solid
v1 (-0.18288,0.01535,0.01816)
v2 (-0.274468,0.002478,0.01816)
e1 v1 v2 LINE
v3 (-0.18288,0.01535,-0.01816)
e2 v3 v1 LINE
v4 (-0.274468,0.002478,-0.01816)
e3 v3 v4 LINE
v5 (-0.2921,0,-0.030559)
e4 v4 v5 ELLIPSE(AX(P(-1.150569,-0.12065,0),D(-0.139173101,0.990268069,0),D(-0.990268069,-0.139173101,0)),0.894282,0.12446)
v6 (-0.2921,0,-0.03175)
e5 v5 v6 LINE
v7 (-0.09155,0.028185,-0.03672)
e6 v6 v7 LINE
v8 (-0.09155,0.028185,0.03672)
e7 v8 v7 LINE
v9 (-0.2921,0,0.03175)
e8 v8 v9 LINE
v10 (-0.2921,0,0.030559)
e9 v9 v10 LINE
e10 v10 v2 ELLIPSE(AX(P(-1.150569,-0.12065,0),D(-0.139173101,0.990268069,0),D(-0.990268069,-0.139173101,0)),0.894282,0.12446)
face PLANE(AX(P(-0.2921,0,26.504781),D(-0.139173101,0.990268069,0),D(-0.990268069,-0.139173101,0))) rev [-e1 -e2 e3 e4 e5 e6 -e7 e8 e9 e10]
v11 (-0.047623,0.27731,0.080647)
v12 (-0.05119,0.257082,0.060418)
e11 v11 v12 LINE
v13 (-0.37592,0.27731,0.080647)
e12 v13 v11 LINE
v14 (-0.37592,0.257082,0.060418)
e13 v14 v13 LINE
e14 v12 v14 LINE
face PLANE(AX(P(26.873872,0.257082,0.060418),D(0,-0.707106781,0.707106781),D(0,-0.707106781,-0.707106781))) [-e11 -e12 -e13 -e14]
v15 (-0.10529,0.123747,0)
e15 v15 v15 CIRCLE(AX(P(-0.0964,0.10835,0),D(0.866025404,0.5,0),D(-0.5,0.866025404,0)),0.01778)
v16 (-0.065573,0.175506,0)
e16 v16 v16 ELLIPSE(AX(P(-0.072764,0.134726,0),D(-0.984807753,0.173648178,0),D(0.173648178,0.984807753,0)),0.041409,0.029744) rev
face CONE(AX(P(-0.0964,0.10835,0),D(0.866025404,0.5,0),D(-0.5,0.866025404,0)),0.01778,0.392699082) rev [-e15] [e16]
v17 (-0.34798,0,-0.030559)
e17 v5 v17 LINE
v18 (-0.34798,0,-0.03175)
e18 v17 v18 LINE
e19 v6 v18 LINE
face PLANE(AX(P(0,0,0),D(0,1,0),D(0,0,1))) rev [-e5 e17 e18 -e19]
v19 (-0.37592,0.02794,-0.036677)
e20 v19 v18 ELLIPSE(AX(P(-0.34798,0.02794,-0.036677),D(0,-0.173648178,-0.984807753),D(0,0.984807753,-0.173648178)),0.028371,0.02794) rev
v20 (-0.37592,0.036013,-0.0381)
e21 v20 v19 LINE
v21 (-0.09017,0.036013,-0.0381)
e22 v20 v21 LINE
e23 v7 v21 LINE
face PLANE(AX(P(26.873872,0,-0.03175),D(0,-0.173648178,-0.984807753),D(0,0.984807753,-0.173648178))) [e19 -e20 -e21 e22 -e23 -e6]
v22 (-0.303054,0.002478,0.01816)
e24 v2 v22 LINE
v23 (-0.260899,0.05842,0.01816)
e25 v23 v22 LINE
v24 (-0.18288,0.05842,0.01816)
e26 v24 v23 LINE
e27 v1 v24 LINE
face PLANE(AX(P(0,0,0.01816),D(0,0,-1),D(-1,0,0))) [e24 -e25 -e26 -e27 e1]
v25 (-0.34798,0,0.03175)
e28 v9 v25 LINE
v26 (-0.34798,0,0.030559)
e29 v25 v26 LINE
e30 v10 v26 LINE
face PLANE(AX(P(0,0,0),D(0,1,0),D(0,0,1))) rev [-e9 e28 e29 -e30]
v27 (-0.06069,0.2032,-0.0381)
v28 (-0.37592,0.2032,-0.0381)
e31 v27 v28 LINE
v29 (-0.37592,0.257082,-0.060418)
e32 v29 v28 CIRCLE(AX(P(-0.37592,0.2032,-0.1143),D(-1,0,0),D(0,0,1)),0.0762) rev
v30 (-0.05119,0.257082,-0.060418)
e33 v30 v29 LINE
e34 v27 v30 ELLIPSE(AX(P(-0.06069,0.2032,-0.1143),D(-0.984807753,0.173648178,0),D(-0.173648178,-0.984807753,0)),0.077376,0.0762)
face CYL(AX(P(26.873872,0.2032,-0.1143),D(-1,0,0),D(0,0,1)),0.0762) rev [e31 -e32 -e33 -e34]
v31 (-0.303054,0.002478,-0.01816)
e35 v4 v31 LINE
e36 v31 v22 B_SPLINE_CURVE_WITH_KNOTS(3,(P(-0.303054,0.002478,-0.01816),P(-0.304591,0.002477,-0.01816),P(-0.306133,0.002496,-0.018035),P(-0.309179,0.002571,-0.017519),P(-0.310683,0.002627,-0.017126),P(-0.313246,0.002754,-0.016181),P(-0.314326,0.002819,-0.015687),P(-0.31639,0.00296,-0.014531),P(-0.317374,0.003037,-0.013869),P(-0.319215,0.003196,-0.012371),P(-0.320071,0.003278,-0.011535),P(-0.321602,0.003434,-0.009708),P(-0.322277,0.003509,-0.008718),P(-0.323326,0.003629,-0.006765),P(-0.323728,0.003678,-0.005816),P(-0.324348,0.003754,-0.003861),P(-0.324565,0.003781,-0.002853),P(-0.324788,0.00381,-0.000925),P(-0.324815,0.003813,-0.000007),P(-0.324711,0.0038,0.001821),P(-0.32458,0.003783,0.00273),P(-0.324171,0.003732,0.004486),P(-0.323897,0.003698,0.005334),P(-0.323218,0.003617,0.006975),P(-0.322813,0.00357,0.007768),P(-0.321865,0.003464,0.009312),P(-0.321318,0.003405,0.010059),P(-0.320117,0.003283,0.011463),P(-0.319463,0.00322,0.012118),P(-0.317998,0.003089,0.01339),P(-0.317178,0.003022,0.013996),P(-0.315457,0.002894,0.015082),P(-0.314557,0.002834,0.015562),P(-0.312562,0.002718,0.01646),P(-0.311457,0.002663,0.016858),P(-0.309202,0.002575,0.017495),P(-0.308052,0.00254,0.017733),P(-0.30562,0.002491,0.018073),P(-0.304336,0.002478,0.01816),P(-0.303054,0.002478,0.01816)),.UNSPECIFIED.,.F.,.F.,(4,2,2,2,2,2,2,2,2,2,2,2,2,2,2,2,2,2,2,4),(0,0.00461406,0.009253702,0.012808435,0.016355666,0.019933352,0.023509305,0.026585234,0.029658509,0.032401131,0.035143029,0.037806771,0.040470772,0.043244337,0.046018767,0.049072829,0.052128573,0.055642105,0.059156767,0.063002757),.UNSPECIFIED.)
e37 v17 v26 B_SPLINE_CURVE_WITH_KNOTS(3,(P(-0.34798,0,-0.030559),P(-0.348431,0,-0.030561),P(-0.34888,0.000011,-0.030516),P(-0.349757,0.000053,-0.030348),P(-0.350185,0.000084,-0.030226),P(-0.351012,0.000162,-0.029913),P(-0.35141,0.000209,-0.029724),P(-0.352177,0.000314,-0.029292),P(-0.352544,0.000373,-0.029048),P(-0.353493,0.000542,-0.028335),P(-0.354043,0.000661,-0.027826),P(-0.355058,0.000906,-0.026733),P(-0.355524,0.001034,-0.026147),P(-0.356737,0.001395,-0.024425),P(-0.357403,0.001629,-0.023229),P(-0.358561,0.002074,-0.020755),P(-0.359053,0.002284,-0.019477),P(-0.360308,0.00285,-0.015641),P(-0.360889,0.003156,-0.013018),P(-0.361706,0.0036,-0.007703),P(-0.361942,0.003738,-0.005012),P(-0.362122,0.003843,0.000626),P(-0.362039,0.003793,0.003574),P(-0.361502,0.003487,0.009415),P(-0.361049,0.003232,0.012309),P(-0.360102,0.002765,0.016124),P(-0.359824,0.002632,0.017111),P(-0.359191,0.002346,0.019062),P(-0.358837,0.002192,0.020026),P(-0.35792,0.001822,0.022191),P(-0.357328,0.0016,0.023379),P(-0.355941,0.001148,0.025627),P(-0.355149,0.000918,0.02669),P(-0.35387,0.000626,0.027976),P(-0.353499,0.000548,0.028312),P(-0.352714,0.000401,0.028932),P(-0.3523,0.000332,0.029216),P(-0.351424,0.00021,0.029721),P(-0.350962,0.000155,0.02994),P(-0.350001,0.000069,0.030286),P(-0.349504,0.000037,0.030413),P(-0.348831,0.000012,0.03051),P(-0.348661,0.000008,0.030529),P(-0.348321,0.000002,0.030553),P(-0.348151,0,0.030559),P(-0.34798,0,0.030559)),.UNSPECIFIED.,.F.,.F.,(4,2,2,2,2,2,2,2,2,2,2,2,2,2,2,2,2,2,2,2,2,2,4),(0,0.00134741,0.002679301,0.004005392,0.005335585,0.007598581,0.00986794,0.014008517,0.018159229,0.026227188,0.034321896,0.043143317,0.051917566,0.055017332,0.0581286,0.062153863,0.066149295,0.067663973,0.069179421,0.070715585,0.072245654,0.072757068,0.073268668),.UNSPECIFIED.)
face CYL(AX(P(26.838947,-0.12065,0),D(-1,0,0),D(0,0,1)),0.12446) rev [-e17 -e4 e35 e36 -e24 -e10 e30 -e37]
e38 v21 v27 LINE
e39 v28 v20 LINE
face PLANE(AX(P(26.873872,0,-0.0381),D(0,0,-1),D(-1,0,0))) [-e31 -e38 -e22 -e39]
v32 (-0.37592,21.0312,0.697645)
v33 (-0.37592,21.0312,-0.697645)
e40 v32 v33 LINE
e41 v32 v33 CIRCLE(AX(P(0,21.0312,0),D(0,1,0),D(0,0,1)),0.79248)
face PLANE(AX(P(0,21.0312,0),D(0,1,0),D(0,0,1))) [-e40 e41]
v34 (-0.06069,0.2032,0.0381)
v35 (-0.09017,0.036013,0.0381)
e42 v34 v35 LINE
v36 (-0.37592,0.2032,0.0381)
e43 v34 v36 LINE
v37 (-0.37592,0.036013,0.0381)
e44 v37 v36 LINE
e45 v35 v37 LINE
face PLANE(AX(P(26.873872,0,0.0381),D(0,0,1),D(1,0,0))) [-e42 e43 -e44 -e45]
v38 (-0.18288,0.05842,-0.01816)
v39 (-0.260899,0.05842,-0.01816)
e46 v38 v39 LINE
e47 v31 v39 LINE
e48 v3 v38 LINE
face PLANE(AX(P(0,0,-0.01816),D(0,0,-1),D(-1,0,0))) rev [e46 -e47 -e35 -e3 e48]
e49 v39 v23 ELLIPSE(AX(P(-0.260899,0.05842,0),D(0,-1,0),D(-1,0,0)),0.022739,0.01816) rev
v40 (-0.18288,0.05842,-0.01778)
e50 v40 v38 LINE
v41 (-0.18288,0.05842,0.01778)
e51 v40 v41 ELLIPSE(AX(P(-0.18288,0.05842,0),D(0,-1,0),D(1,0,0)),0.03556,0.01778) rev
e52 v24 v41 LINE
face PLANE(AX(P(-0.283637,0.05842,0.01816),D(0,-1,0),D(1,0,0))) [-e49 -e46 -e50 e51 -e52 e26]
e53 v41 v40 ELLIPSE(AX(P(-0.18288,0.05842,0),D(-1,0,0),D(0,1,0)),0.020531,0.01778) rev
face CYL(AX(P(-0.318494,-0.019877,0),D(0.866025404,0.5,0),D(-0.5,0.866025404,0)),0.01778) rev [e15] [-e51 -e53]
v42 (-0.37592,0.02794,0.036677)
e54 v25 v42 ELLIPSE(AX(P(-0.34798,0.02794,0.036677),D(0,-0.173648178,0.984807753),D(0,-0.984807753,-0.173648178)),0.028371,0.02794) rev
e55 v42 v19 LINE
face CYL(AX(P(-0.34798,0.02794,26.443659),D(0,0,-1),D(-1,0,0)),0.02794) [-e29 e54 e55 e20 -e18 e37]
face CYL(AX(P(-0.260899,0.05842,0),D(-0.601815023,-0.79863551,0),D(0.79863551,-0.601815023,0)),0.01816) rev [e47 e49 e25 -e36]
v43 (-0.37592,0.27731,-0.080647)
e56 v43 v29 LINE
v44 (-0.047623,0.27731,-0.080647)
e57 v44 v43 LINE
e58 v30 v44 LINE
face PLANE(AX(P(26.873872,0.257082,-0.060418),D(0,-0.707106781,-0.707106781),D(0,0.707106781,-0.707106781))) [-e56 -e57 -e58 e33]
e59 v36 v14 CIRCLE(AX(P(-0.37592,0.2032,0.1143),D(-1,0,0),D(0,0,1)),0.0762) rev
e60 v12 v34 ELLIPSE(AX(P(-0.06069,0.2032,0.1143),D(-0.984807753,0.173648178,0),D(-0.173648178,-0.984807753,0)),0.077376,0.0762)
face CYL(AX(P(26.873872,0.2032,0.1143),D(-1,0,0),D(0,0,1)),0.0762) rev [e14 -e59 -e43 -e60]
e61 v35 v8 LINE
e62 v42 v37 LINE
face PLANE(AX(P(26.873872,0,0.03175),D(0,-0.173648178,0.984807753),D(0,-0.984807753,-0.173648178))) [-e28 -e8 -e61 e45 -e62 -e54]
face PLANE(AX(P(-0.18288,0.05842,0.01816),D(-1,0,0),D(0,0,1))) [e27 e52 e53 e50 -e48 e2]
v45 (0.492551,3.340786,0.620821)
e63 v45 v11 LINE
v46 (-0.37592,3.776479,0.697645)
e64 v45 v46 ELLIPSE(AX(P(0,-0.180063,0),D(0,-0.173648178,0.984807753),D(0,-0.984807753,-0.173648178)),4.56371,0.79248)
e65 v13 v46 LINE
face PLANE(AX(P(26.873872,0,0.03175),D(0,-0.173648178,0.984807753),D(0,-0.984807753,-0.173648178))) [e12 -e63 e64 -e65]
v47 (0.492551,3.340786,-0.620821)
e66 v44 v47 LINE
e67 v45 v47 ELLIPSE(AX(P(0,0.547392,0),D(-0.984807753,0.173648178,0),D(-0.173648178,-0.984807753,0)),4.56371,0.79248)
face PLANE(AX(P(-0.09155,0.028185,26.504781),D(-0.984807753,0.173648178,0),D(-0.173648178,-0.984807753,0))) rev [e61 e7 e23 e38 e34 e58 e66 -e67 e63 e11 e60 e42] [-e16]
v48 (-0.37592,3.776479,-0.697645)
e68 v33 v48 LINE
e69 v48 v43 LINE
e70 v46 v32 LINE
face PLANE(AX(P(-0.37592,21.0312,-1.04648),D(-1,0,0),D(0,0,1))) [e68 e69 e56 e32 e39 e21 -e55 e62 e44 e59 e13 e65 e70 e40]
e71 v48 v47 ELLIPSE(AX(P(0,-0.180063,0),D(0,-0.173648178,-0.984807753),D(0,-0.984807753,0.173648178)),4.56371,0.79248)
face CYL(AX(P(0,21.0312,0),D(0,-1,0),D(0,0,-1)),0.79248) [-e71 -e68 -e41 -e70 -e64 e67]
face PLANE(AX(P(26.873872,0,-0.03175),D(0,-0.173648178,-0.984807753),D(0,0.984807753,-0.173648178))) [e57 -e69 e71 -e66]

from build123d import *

# Parameters (mm, degrees)
TD_SKETCH_R                             = 0.79248
TL_FEATURE_DEPTH                        = 21.0312
TDF_STD_SKETCH_W                        = 2.09296
TDF_STD_SKETCH_H                        = 2.09296
TDF_STD_FEATURE_DEPTH                   = 22.061040395
ISA_20_STD_FEATURE_DEPTH                = 22.061040395
ISA_20_STD_FEATURE_DEPTH_BACK           = 22.061040395
VW_STD_FEATURE_DEPTH                    = 22.061040395
VW_STD_FEATURE_DEPTH_BACK               = 22.061040395
F_10BA_STD_FEATURE_DEPTH                = 22.061040503
F_10BA_STD_FEATURE_DEPTH_BACK           = 22.061040503
FRO_STD_FEATURE_DEPTH                   = 22.061040395
FRO_STD_FEATURE_DEPTH_BACK              = 22.061040395
C_STD_FEATURE_DEPTH                     = 22.061040395
C_STD_FEATURE_DEPTH_BACK                = 22.061040395
ERW_STD_FEATURE_DEPTH                   = 0.018159984
H_STD_FEATURE_REACH                     = 22.957
H_STD_SKETCH_R                          = 0.01778
H_STD_SKETCH_3_R                        = 0.01778
FUNNEL_FINAL_DIAMETRE_STD_FEATURE_DEPTH = 2.499995
FUNNEL_FINAL_DIAMETRE_STD_FEATURE_DRAFT = -22.5
ROUND_BR_STD_FEATURE_START              = -1
ROUND_BR_STD_FEATURE_DEPTH              = 0.936596355


with BuildPart() as part:
    # TD_sketch → TL_feature (new body)
    with BuildSketch(Plane(origin=(0, 0, 0), x_dir=(1, 0, 0), z_dir=(0, 1, 0))):
        with Locations(Location((0, 0, 0), (0, 0, 270))):
            Circle(TD_SKETCH_R)
    extrude(amount=TL_FEATURE_DEPTH)

    # TDF_STD_sketch → TDF_STD_feature (cut, through all)
    with BuildSketch(Plane(origin=(0, 0, 0), x_dir=(1, 0, 0), z_dir=(0, 1, 0))):
        with Locations((-1.4224, 0)):
            Rectangle(TDF_STD_SKETCH_W, TDF_STD_SKETCH_H)
    extrude(amount=TDF_STD_FEATURE_DEPTH, mode=Mode.SUBTRACT)

    # ISA_20_STD_sketch → ISA_20_STD_feature (cut, two sides: drawn at the far end of the back side and taken through both)
    with BuildSketch(Plane(origin=(0, 0, 0), x_dir=(0, 0, -1), z_dir=(1, 0, 0)).offset(-ISA_20_STD_FEATURE_DEPTH_BACK)):
        Polygon((-12.948362797, 73.253751326), (-3.740117997, 21.0312), (-0.03175, 0), (0.03175, 0), (3.740117997, 21.0312), (12.948362797, 73.253751326), (12.948362797, -32.802585388), (-12.948362797, -32.802585388), align=None)
    extrude(amount=ISA_20_STD_FEATURE_DEPTH + ISA_20_STD_FEATURE_DEPTH_BACK, mode=Mode.SUBTRACT)

    # VW_STD_sketch → VW_STD_feature (cut, two sides: drawn at the far end of the back side and taken through both)
    with BuildSketch(Plane(origin=(0, 0, 0), x_dir=(0, 0, -1), z_dir=(1, 0, 0)).offset(-VW_STD_FEATURE_DEPTH_BACK)):
        with BuildLine():
            Line((-70.567982417, 70.76464549), (-20.834536927, 21.0312))
            Line((-20.834536927, 21.0312), (-0.060418463, 0.257081537))
            ThreePointArc((-0.060418463, 0.257081537), (-0.04390038, 0.232360478), (-0.0381, 0.2032))
            Line((-0.0381, 0.2032), (-0.0381, 0))
            Line((-0.0381, 0), (0.0381, 0))
            Line((0.0381, 0), (0.0381, 0.2032))
            ThreePointArc((0.0381, 0.2032), (0.04390038, 0.232360478), (0.060418463, 0.257081537))
            Line((0.060418463, 0.257081537), (20.834536927, 21.0312))
            Line((20.834536927, 21.0312), (70.567982417, 70.76464549))
            Line((70.567982417, 70.76464549), (70.567982417, -69.902780741))
            Line((70.567982417, -69.902780741), (-70.567982417, -69.902780741))
            Line((-70.567982417, -69.902780741), (-70.567982417, 70.76464549))
        make_face()
    extrude(amount=VW_STD_FEATURE_DEPTH + VW_STD_FEATURE_DEPTH_BACK, mode=Mode.SUBTRACT)

    # 10BA_STD_sketch → 10BA_STD_feature (cut, two sides: drawn at the far end of the back side and taken through both)
    with BuildSketch(Plane.XY.offset(-F_10BA_STD_FEATURE_DEPTH_BACK)):
        Polygon((-53.187772193, 0), (-0.37592, 0), (-0.2921, 0), (-0.091550146, 0.028185444), (3.611847997, 21.0312), (12.782529889, 73.04072149), (91.167207648, 2.243763782), (25.196905566, -70.796957708), align=None)
    extrude(amount=F_10BA_STD_FEATURE_DEPTH + F_10BA_STD_FEATURE_DEPTH_BACK, mode=Mode.SUBTRACT)

    # FRO_STD_sketch → FRO_STD_feature (cut, two sides: drawn at the far end of the back side and taken through both)
    with BuildSketch(Plane.XY.offset(-FRO_STD_FEATURE_DEPTH_BACK)):
        with BuildLine():
            Line((-0.37592, 52.152138388), (-0.37592, 0.02794))
            ThreePointArc((-0.37592, 0.02794), (-0.367736563, 0.008183437), (-0.34798, 0))
            Line((-0.34798, 0), (51.776218388, 0))
            Line((51.776218388, 0), (-21.9385299, -73.714748288))
            Line((-21.9385299, -73.714748288), (-74.090668288, -21.5626099))
            Line((-74.090668288, -21.5626099), (-0.37592, 52.152138388))
        make_face()
    extrude(amount=FRO_STD_FEATURE_DEPTH + FRO_STD_FEATURE_DEPTH_BACK, mode=Mode.SUBTRACT)

    # C_STD_sketch → C_STD_feature (cut, two sides: drawn at the far end of the back side and taken through both)
    with BuildSketch(Plane(origin=(0, 0, 0), x_dir=(0, 0, -1), z_dir=(1, 0, 0)).offset(-C_STD_FEATURE_DEPTH_BACK)):
        with BuildLine():
            Line((-50.530423385, -12.791040855), (-0.030559272, 0))
            ThreePointArc((-0.030559272, 0), (0, 0.00381), (0.030559272, 0))
            Line((0.030559272, 0), (50.530423385, -12.791040855))
            Line((50.530423385, -12.791040855), (50.530423385, -116.980234183))
            Line((50.530423385, -116.980234183), (-50.530423385, -116.980234183))
            Line((-50.530423385, -116.980234183), (-50.530423385, -12.791040855))
        make_face()
    extrude(amount=C_STD_FEATURE_DEPTH + C_STD_FEATURE_DEPTH_BACK, mode=Mode.SUBTRACT)


with BuildPart() as body_2:
    # ERW_STD_sketch → ERW_STD_feature (new, symmetric)
    with BuildSketch(Plane.XY):
        Polygon((-0.18288, 0.05842), (-0.18288, 0), (-0.32766, 0), (-0.283637372, 0.05842), align=None)
    extrude(amount=ERW_STD_FEATURE_DEPTH, both=True)

    # H_STD_sketch → H_STD_feature (add, up to next)
    with BuildSketch(Plane(origin=(-0.096399563, 0.108349503, 0), x_dir=(0, 0, -1), z_dir=(0.8660254037844415, 0.4999999999999953, 0)), mode=Mode.PRIVATE) as h_std_feature_sk1:
        with Locations(Location((0, 0, 0), (0, 0, 90))):
            Circle(H_STD_SKETCH_R)
    h_std_feature_tool1 = extrude(h_std_feature_sk1.sketch, amount=-H_STD_FEATURE_REACH, mode=Mode.PRIVATE) - body_2.part
    add(h_std_feature_tool1.solids().sort_by_distance((-0.0964, 0.10835, 0))[0])


with BuildPart() as funnel_final_diametre_std_feature_tool:
    # H_STD_sketch<3> → funnel_final_diametre_STD_feature (with draft: the straight prism first)
    with BuildSketch(Plane(origin=(-0.096399563, 0.108349503, 0), x_dir=(0, 0, -1), z_dir=(0.8660254037844415, 0.4999999999999953, 0))):
        with Locations(Location((0, 0, 0), (0, 0, 90))):
            Circle(H_STD_SKETCH_3_R)
    extrude(amount=FUNNEL_FINAL_DIAMETRE_STD_FEATURE_DEPTH)
    # funnel_final_diametre_STD_feature: the draft: its side faces are tilted about the plane it starts from
    funnel_final_diametre_std_feature_sides = [funnel_final_diametre_std_feature_tool.faces().sort_by_distance(p)[0] for p in [
        (0.995020026, 0.717950322, 0),
    ]]
    draft(funnel_final_diametre_std_feature_sides, Plane(origin=(-0.096399563, 0.108349503, 0), x_dir=(0, 0, -1), z_dir=(0.8660254037844415, 0.4999999999999953, 0)), FUNNEL_FINAL_DIAMETRE_STD_FEATURE_DRAFT)


with BuildPart() as body_2_1:
    add(body_2.part)

    # funnel_final_diametre_STD_feature: add funnel_final_diametre_std_feature_tool
    add(funnel_final_diametre_std_feature_tool.part)

    # ROUND_BR_STD_feature: read off the stored shape, not the designer's step
    # ROUND_BR_STD_feature outline → ROUND_BR_STD_feature (cut)
    with BuildSketch(Plane(origin=(0, 0, 0), x_dir=(0.79863551004729, -0.601815023152052, 0), z_dir=(0.601815023152052, 0.79863551004729, 0)).offset(ROUND_BR_STD_FEATURE_START)):
        with BuildLine():
            Line((-0.261680911, -0.018159984), (-0.243520927, -0.018159984))
            ThreePointArc((-0.243520927, -0.018159984), (-0.256361975, -0.012841048), (-0.261680911, 0))
            Line((-0.261680911, 0), (-0.261680911, -0.018159984))
        make_face()
        with BuildLine():
            Line((-0.261680911, 0.018159984), (-0.261680911, 0))
            ThreePointArc((-0.261680911, 0), (-0.256361975, 0.012841048), (-0.243520927, 0.018159984))
            Line((-0.243520927, 0.018159984), (-0.261680911, 0.018159984))
        make_face()
    extrude(amount=ROUND_BR_STD_FEATURE_DEPTH, mode=Mode.SUBTRACT)


with BuildPart() as part_1:
    add(part.part)

    # COMBINE_STD_feature: cut body 2
    add(body_2_1.part, mode=Mode.SUBTRACT)


solid = part_1.part
